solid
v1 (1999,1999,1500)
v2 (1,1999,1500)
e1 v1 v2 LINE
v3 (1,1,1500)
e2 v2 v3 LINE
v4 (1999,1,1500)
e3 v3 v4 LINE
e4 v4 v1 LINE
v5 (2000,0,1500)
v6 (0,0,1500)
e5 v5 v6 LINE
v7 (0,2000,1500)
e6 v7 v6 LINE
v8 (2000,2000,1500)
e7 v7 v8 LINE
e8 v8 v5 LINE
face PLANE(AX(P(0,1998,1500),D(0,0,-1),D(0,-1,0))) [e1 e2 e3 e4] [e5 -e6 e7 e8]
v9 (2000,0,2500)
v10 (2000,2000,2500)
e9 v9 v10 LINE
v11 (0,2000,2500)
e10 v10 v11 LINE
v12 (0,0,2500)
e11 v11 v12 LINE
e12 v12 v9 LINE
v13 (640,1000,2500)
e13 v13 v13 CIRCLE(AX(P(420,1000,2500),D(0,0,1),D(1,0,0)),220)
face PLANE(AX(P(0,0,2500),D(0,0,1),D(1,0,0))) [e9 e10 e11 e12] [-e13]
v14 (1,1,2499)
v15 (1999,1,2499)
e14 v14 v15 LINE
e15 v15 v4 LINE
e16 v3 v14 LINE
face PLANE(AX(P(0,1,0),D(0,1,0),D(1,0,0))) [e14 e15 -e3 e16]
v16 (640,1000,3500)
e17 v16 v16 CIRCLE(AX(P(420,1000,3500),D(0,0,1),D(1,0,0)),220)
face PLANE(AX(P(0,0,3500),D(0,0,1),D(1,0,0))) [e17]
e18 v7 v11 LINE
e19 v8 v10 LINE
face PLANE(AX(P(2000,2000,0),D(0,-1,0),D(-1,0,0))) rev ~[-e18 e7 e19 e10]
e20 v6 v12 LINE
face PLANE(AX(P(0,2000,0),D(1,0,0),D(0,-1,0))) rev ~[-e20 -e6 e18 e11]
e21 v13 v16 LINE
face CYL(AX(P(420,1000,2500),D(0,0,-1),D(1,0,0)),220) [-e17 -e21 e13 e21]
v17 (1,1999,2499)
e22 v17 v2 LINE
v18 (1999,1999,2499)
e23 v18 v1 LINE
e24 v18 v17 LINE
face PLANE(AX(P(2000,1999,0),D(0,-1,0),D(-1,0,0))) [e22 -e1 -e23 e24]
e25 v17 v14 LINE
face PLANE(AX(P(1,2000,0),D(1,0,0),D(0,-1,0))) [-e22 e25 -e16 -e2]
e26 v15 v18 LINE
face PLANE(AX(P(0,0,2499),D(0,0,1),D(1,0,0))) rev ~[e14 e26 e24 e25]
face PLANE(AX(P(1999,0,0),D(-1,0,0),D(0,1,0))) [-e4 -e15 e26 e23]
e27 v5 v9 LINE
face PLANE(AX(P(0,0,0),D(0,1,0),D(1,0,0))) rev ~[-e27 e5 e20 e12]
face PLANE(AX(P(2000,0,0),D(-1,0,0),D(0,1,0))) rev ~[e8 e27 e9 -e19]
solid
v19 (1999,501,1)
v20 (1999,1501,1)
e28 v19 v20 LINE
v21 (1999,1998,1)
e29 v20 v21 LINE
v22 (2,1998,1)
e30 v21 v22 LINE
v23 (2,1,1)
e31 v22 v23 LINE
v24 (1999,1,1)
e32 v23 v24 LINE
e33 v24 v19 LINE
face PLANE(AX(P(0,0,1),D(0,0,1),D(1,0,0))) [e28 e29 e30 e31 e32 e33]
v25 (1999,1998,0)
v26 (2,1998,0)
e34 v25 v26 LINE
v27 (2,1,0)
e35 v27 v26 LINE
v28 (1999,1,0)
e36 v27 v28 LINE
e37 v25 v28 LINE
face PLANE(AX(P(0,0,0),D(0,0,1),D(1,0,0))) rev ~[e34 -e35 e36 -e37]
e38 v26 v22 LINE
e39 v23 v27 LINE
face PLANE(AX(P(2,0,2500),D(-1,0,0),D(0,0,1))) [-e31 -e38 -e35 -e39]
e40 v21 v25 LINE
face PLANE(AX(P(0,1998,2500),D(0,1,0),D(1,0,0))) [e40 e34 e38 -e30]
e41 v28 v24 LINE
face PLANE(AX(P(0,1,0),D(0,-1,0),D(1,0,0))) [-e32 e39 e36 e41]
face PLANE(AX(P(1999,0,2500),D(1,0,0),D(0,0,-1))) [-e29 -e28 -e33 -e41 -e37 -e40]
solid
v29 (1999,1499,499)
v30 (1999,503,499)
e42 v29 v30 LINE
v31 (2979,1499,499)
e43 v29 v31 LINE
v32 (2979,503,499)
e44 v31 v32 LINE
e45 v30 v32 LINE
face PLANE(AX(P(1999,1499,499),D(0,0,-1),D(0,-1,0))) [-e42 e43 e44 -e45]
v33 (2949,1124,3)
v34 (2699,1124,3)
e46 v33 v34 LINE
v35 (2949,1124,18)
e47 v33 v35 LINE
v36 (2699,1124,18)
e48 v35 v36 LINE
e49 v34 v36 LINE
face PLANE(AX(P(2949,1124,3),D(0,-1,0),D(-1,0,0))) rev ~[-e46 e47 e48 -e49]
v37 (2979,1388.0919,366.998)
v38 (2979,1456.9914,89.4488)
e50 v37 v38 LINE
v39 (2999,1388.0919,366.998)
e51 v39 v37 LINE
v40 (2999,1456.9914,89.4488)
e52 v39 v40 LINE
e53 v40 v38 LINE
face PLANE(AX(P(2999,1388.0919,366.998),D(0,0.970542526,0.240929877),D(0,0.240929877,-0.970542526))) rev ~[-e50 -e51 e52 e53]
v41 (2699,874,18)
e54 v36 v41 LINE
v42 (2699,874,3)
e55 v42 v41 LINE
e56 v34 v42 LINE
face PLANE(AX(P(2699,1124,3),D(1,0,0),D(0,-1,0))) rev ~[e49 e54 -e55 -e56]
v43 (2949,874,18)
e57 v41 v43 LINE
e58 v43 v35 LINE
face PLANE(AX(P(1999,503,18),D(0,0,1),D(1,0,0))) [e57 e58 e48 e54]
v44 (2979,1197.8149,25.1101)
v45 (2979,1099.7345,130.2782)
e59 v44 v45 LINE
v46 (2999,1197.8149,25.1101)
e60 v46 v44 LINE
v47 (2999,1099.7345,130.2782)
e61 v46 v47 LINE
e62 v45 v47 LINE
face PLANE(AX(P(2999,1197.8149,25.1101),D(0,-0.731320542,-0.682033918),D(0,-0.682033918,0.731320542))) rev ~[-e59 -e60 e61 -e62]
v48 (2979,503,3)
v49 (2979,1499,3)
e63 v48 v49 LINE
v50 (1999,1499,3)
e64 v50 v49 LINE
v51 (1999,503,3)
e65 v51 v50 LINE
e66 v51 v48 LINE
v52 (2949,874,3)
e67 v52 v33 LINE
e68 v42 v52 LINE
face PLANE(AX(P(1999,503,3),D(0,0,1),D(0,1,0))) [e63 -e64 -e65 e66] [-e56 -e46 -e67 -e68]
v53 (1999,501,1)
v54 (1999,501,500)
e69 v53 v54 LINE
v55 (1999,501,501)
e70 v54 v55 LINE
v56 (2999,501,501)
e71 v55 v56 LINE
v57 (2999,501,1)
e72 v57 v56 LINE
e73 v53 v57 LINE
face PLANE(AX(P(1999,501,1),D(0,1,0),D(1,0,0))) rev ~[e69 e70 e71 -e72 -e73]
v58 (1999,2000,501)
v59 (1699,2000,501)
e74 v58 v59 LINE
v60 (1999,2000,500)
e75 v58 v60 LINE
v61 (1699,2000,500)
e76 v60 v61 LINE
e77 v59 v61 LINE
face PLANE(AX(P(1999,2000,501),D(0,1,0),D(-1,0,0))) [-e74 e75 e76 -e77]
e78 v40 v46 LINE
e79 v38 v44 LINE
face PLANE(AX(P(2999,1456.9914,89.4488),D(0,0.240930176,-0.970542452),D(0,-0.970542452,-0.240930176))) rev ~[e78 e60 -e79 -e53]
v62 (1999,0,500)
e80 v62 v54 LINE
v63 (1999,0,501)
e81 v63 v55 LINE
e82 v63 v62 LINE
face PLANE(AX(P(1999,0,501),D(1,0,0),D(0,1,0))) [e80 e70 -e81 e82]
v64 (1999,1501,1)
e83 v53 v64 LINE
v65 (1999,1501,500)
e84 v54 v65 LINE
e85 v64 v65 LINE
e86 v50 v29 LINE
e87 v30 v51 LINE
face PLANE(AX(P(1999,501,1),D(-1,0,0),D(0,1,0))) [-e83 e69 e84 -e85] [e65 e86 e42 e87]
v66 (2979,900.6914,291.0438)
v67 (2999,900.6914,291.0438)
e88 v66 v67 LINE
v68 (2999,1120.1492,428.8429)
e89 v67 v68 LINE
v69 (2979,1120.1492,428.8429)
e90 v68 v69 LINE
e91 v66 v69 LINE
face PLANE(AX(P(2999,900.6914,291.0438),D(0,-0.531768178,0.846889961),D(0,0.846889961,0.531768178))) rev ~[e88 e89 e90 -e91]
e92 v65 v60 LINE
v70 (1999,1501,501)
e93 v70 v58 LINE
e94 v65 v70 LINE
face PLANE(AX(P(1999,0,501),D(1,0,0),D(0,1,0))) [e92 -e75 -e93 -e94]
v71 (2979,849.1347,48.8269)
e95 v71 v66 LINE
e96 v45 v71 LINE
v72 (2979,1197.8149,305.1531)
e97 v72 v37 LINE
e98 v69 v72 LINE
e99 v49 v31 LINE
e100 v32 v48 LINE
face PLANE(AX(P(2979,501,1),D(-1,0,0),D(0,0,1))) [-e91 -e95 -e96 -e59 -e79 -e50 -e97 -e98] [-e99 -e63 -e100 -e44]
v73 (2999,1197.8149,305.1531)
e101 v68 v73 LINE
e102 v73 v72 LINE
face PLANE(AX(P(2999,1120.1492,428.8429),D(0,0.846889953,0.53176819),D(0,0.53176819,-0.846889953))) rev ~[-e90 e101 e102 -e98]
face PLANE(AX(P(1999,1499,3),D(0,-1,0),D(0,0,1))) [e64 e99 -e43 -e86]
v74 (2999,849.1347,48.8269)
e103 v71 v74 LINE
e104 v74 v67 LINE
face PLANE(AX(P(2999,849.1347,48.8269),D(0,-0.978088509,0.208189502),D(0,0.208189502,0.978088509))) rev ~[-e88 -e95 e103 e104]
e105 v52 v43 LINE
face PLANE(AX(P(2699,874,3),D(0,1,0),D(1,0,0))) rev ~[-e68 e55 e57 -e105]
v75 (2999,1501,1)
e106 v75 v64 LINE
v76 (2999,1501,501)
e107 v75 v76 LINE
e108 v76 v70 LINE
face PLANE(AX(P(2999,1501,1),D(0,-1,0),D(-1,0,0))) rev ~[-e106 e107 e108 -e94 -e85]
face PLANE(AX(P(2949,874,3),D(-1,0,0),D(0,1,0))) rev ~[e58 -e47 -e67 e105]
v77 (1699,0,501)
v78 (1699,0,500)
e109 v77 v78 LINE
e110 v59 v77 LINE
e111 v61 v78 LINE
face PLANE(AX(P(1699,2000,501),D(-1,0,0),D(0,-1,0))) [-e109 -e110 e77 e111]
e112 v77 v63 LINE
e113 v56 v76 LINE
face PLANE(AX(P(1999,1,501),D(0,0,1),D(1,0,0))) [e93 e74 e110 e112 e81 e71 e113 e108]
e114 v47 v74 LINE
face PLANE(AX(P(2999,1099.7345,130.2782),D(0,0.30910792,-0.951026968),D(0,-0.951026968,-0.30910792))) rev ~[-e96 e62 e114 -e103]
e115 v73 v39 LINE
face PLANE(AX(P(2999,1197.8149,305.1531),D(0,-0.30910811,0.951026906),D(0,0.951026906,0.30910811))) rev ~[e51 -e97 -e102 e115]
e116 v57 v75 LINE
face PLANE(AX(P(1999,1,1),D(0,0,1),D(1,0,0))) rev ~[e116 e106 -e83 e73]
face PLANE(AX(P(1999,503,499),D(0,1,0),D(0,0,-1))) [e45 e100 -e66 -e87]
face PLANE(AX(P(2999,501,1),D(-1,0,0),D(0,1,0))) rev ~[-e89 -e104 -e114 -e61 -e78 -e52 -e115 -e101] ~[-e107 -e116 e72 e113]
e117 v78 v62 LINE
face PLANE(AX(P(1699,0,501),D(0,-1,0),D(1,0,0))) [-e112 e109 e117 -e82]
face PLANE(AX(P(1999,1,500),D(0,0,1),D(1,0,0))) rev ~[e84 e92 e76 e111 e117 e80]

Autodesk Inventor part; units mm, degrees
ref_plane "YZ Plane" through (0, 0, 0) normal (1, 0, 0) x (0, 1, 0)
ref_plane "XZ Plane" through (0, 0, 0) normal (0, 1, 0) x (-1, 0, 0)
ref_plane "XY Plane" through (0, 0, 0) normal (0, 0, 1) x (1, 0, 0)
sketch "Sketch1" plane through (0, 0, 0) normal (0, 0, 1) x (1, 0, 0)
  line L0 (0, 0) -> (2000, 0)
  line L1 (2000, 0) -> (2000, 2000)
  line L2 (2000, 2000) -> (0, 2000)
  line L3 (0, 2000) -> (0, 0)
  dimension "d0" = 2000
  dimension "d2" = 2000
extrude "Extrusion1" add sketch "Sketch1" along normal blind 2500
shell "Shell1" thickness 1 removed faces 0
sketch "Sketch2" plane through (0, 0, 0) normal (0, -1, 0) x (1, 0, 0)
  line L0 (0, 0) -> (2000, 0) projected
  line L1 (2000, 0) -> (2000, 2500) projected
  line L2 (0, 0) -> (2000, 0)
  line L3 (2000, 0) -> (2000, 1500)
  line L4 (2000, 1500) -> (0, 1500)
  line L5 (0, 1500) -> (0, 0)
  dimension "d6" = 1500
extrude "Extrusion2" cut sketch "Sketch2" along normal mid plane 2
sketch "Sketch3" plane through (2000, 0, 2500) normal (1, 0, 0) x (0, 0, -1)
  line L0 (2500, 2000) -> (0, 2000) projected
  line L1 (2500, 0) -> (1000, 0)
  line L2 (1000, 0) -> (1000, 2000)
  line L3 (1000, 2000) -> (2500, 2000)
  line L4 (2500, 2000) -> (2500, 0)
  dimension "d10" = 1500
extrude "Extrusion3" cut sketch "Sketch3" along normal mid plane 2
sketch "Sketch4" plane through (0, 2000, 2500) normal (0, 1, 0) x (1, 0, 0)
  line L0 (0, 2500) -> (0, 0) projected
  line L1 (1999, 2500) -> (0, 2500)
  line L2 (0, 2500) -> (0, 1000)
  line L3 (0, 1000) -> (1999, 1000)
  line L4 (1999, 1000) -> (1999, 2500)
  dimension "d14" = 1500
extrude "Extrusion4" cut sketch "Sketch4" against normal blind 2
sketch "Sketch5" plane through (0, 0, 2500) normal (-1, 0, 0) x (0, 0, 1)
  line L0 (-1000, 0) -> (0, 0) projected
  line L1 (-2500, 1998) -> (-1000, 1998)
  line L2 (-1000, 1998) -> (-1000, 0)
  line L3 (-1000, 0) -> (-2500, 0)
  line L4 (-2500, 0) -> (-2500, 1998)
  point P0 (-2500, 0)
  dimension "d18" = 1500
extrude "Extrusion5" cut sketch "Sketch5" against normal blind 2
sketch "Sketch8" plane through (1999, 1, 1) normal (0, 0, 1) x (1, 0, 0)
  line L0 (-1997, 0) -> (0, 0) projected
  line L1 (0, 0) -> (0, 1997) projected
  line L2 (0, 500) -> (1000, 500)
  line L3 (1000, 500) -> (1000, 1500)
  line L4 (1000, 1500) -> (0, 1500)
  line L5 (0, 1500) -> (0, 500)
  point P0 (-1999, -1)
  dimension "d30" = 500
  dimension "d31" = 1000
  dimension "d65" = 1000
extrude "Extrusion8" add sketch "Sketch8" along normal blind 500
sketch "Sketch9" plane through (1999, 1, 501) normal (0, 0, 1) x (1, 0, 0)
  line L0 (-300, -1) -> (0, -1)
  line L1 (0, -1) -> (0, 1999)
  line L2 (0, 1999) -> (-300, 1999)
  line L3 (-300, 1999) -> (-300, -1)
  point P0 (-1999, -1)
  dimension "d34" = 2000
  dimension "d36" = 300
extrude "Extrusion9" add sketch "Sketch9" against normal blind 1
sketch "Sketch10" plane through (0, 0, 2500) normal (0, 0, 1) x (1, 0, 0)
  line L0 (0, 0) -> (2000, 0) projected
  line L1 (0, 2000) -> (0, 0) projected
  circle A0 centre (420, 1000) radius 220
  dimension "d39" = 440
  dimension "d41" = 420
  dimension "d42" = 1000
extrude "Extrusion10" add sketch "Sketch10" along normal blind 1000
sketch "Sketch12" plane through (1999, 501, 1) normal (-1, 0, 0) x (0, 0, 1)
  line L0 (0, 0) -> (0, 1000) projected
  line L1 (0, 0) -> (499, 0) projected
  line L2 (2, 998) -> (498, 998)
  line L3 (498, 998) -> (498, 2)
  line L4 (498, 2) -> (2, 2)
  line L5 (2, 2) -> (2, 998)
  point P0 (-1, -501)
  dimension "d51" = 496
  dimension "d53" = 2
  dimension "d54" = 996
  dimension "d55" = 2
extrude "Extrusion12" cut sketch "Sketch12" against normal blind 980
sketch "Sketch15" plane through (1999, 503, 3) normal (0, 0, 1) x (1, 0, 0)
  line L0 (0, 996) -> (980, 996) projected
  line L1 (700, 371) -> (950, 371)
  line L2 (950, 371) -> (950, 621)
  line L3 (950, 621) -> (700, 621)
  line L4 (700, 621) -> (700, 371)
  line L5 (1000, -2) -> (1000, 998) projected
  point P0 (-1999, -503)
  dimension "d58" = 250
  dimension "d60" = 250
  dimension "d61" = 375
  dimension "d68" = 50
extrude "Extrusion13" add sketch "Sketch15" along normal blind 15
sketch "Sketch17" plane through (2999, 501, 1) normal (1, 0, 0) x (0, 0, -1)
  line L0 (-290.0438, 399.6914) -> (-427.8429, 619.1492)
  line L1 (-427.8429, 619.1492) -> (-304.1531, 696.8149)
  line L2 (-304.1531, 696.8149) -> (-365.998, 887.0919)
  line L3 (-365.998, 887.0919) -> (-88.4488, 955.9914)
  line L4 (-88.4488, 955.9914) -> (-24.1101, 696.8149)
  line L5 (-24.1101, 696.8149) -> (-129.2782, 598.7345)
  line L6 (-129.2782, 598.7345) -> (-47.8269, 348.1347)
  line L7 (-47.8269, 348.1347) -> (-290.0438, 399.6914)
  point P0 (1, -501)
extrude "Extrusion15" cut sketch "Sketch17" along normal mid plane 100
properties part number "Harrison_Spill_Plumes"
